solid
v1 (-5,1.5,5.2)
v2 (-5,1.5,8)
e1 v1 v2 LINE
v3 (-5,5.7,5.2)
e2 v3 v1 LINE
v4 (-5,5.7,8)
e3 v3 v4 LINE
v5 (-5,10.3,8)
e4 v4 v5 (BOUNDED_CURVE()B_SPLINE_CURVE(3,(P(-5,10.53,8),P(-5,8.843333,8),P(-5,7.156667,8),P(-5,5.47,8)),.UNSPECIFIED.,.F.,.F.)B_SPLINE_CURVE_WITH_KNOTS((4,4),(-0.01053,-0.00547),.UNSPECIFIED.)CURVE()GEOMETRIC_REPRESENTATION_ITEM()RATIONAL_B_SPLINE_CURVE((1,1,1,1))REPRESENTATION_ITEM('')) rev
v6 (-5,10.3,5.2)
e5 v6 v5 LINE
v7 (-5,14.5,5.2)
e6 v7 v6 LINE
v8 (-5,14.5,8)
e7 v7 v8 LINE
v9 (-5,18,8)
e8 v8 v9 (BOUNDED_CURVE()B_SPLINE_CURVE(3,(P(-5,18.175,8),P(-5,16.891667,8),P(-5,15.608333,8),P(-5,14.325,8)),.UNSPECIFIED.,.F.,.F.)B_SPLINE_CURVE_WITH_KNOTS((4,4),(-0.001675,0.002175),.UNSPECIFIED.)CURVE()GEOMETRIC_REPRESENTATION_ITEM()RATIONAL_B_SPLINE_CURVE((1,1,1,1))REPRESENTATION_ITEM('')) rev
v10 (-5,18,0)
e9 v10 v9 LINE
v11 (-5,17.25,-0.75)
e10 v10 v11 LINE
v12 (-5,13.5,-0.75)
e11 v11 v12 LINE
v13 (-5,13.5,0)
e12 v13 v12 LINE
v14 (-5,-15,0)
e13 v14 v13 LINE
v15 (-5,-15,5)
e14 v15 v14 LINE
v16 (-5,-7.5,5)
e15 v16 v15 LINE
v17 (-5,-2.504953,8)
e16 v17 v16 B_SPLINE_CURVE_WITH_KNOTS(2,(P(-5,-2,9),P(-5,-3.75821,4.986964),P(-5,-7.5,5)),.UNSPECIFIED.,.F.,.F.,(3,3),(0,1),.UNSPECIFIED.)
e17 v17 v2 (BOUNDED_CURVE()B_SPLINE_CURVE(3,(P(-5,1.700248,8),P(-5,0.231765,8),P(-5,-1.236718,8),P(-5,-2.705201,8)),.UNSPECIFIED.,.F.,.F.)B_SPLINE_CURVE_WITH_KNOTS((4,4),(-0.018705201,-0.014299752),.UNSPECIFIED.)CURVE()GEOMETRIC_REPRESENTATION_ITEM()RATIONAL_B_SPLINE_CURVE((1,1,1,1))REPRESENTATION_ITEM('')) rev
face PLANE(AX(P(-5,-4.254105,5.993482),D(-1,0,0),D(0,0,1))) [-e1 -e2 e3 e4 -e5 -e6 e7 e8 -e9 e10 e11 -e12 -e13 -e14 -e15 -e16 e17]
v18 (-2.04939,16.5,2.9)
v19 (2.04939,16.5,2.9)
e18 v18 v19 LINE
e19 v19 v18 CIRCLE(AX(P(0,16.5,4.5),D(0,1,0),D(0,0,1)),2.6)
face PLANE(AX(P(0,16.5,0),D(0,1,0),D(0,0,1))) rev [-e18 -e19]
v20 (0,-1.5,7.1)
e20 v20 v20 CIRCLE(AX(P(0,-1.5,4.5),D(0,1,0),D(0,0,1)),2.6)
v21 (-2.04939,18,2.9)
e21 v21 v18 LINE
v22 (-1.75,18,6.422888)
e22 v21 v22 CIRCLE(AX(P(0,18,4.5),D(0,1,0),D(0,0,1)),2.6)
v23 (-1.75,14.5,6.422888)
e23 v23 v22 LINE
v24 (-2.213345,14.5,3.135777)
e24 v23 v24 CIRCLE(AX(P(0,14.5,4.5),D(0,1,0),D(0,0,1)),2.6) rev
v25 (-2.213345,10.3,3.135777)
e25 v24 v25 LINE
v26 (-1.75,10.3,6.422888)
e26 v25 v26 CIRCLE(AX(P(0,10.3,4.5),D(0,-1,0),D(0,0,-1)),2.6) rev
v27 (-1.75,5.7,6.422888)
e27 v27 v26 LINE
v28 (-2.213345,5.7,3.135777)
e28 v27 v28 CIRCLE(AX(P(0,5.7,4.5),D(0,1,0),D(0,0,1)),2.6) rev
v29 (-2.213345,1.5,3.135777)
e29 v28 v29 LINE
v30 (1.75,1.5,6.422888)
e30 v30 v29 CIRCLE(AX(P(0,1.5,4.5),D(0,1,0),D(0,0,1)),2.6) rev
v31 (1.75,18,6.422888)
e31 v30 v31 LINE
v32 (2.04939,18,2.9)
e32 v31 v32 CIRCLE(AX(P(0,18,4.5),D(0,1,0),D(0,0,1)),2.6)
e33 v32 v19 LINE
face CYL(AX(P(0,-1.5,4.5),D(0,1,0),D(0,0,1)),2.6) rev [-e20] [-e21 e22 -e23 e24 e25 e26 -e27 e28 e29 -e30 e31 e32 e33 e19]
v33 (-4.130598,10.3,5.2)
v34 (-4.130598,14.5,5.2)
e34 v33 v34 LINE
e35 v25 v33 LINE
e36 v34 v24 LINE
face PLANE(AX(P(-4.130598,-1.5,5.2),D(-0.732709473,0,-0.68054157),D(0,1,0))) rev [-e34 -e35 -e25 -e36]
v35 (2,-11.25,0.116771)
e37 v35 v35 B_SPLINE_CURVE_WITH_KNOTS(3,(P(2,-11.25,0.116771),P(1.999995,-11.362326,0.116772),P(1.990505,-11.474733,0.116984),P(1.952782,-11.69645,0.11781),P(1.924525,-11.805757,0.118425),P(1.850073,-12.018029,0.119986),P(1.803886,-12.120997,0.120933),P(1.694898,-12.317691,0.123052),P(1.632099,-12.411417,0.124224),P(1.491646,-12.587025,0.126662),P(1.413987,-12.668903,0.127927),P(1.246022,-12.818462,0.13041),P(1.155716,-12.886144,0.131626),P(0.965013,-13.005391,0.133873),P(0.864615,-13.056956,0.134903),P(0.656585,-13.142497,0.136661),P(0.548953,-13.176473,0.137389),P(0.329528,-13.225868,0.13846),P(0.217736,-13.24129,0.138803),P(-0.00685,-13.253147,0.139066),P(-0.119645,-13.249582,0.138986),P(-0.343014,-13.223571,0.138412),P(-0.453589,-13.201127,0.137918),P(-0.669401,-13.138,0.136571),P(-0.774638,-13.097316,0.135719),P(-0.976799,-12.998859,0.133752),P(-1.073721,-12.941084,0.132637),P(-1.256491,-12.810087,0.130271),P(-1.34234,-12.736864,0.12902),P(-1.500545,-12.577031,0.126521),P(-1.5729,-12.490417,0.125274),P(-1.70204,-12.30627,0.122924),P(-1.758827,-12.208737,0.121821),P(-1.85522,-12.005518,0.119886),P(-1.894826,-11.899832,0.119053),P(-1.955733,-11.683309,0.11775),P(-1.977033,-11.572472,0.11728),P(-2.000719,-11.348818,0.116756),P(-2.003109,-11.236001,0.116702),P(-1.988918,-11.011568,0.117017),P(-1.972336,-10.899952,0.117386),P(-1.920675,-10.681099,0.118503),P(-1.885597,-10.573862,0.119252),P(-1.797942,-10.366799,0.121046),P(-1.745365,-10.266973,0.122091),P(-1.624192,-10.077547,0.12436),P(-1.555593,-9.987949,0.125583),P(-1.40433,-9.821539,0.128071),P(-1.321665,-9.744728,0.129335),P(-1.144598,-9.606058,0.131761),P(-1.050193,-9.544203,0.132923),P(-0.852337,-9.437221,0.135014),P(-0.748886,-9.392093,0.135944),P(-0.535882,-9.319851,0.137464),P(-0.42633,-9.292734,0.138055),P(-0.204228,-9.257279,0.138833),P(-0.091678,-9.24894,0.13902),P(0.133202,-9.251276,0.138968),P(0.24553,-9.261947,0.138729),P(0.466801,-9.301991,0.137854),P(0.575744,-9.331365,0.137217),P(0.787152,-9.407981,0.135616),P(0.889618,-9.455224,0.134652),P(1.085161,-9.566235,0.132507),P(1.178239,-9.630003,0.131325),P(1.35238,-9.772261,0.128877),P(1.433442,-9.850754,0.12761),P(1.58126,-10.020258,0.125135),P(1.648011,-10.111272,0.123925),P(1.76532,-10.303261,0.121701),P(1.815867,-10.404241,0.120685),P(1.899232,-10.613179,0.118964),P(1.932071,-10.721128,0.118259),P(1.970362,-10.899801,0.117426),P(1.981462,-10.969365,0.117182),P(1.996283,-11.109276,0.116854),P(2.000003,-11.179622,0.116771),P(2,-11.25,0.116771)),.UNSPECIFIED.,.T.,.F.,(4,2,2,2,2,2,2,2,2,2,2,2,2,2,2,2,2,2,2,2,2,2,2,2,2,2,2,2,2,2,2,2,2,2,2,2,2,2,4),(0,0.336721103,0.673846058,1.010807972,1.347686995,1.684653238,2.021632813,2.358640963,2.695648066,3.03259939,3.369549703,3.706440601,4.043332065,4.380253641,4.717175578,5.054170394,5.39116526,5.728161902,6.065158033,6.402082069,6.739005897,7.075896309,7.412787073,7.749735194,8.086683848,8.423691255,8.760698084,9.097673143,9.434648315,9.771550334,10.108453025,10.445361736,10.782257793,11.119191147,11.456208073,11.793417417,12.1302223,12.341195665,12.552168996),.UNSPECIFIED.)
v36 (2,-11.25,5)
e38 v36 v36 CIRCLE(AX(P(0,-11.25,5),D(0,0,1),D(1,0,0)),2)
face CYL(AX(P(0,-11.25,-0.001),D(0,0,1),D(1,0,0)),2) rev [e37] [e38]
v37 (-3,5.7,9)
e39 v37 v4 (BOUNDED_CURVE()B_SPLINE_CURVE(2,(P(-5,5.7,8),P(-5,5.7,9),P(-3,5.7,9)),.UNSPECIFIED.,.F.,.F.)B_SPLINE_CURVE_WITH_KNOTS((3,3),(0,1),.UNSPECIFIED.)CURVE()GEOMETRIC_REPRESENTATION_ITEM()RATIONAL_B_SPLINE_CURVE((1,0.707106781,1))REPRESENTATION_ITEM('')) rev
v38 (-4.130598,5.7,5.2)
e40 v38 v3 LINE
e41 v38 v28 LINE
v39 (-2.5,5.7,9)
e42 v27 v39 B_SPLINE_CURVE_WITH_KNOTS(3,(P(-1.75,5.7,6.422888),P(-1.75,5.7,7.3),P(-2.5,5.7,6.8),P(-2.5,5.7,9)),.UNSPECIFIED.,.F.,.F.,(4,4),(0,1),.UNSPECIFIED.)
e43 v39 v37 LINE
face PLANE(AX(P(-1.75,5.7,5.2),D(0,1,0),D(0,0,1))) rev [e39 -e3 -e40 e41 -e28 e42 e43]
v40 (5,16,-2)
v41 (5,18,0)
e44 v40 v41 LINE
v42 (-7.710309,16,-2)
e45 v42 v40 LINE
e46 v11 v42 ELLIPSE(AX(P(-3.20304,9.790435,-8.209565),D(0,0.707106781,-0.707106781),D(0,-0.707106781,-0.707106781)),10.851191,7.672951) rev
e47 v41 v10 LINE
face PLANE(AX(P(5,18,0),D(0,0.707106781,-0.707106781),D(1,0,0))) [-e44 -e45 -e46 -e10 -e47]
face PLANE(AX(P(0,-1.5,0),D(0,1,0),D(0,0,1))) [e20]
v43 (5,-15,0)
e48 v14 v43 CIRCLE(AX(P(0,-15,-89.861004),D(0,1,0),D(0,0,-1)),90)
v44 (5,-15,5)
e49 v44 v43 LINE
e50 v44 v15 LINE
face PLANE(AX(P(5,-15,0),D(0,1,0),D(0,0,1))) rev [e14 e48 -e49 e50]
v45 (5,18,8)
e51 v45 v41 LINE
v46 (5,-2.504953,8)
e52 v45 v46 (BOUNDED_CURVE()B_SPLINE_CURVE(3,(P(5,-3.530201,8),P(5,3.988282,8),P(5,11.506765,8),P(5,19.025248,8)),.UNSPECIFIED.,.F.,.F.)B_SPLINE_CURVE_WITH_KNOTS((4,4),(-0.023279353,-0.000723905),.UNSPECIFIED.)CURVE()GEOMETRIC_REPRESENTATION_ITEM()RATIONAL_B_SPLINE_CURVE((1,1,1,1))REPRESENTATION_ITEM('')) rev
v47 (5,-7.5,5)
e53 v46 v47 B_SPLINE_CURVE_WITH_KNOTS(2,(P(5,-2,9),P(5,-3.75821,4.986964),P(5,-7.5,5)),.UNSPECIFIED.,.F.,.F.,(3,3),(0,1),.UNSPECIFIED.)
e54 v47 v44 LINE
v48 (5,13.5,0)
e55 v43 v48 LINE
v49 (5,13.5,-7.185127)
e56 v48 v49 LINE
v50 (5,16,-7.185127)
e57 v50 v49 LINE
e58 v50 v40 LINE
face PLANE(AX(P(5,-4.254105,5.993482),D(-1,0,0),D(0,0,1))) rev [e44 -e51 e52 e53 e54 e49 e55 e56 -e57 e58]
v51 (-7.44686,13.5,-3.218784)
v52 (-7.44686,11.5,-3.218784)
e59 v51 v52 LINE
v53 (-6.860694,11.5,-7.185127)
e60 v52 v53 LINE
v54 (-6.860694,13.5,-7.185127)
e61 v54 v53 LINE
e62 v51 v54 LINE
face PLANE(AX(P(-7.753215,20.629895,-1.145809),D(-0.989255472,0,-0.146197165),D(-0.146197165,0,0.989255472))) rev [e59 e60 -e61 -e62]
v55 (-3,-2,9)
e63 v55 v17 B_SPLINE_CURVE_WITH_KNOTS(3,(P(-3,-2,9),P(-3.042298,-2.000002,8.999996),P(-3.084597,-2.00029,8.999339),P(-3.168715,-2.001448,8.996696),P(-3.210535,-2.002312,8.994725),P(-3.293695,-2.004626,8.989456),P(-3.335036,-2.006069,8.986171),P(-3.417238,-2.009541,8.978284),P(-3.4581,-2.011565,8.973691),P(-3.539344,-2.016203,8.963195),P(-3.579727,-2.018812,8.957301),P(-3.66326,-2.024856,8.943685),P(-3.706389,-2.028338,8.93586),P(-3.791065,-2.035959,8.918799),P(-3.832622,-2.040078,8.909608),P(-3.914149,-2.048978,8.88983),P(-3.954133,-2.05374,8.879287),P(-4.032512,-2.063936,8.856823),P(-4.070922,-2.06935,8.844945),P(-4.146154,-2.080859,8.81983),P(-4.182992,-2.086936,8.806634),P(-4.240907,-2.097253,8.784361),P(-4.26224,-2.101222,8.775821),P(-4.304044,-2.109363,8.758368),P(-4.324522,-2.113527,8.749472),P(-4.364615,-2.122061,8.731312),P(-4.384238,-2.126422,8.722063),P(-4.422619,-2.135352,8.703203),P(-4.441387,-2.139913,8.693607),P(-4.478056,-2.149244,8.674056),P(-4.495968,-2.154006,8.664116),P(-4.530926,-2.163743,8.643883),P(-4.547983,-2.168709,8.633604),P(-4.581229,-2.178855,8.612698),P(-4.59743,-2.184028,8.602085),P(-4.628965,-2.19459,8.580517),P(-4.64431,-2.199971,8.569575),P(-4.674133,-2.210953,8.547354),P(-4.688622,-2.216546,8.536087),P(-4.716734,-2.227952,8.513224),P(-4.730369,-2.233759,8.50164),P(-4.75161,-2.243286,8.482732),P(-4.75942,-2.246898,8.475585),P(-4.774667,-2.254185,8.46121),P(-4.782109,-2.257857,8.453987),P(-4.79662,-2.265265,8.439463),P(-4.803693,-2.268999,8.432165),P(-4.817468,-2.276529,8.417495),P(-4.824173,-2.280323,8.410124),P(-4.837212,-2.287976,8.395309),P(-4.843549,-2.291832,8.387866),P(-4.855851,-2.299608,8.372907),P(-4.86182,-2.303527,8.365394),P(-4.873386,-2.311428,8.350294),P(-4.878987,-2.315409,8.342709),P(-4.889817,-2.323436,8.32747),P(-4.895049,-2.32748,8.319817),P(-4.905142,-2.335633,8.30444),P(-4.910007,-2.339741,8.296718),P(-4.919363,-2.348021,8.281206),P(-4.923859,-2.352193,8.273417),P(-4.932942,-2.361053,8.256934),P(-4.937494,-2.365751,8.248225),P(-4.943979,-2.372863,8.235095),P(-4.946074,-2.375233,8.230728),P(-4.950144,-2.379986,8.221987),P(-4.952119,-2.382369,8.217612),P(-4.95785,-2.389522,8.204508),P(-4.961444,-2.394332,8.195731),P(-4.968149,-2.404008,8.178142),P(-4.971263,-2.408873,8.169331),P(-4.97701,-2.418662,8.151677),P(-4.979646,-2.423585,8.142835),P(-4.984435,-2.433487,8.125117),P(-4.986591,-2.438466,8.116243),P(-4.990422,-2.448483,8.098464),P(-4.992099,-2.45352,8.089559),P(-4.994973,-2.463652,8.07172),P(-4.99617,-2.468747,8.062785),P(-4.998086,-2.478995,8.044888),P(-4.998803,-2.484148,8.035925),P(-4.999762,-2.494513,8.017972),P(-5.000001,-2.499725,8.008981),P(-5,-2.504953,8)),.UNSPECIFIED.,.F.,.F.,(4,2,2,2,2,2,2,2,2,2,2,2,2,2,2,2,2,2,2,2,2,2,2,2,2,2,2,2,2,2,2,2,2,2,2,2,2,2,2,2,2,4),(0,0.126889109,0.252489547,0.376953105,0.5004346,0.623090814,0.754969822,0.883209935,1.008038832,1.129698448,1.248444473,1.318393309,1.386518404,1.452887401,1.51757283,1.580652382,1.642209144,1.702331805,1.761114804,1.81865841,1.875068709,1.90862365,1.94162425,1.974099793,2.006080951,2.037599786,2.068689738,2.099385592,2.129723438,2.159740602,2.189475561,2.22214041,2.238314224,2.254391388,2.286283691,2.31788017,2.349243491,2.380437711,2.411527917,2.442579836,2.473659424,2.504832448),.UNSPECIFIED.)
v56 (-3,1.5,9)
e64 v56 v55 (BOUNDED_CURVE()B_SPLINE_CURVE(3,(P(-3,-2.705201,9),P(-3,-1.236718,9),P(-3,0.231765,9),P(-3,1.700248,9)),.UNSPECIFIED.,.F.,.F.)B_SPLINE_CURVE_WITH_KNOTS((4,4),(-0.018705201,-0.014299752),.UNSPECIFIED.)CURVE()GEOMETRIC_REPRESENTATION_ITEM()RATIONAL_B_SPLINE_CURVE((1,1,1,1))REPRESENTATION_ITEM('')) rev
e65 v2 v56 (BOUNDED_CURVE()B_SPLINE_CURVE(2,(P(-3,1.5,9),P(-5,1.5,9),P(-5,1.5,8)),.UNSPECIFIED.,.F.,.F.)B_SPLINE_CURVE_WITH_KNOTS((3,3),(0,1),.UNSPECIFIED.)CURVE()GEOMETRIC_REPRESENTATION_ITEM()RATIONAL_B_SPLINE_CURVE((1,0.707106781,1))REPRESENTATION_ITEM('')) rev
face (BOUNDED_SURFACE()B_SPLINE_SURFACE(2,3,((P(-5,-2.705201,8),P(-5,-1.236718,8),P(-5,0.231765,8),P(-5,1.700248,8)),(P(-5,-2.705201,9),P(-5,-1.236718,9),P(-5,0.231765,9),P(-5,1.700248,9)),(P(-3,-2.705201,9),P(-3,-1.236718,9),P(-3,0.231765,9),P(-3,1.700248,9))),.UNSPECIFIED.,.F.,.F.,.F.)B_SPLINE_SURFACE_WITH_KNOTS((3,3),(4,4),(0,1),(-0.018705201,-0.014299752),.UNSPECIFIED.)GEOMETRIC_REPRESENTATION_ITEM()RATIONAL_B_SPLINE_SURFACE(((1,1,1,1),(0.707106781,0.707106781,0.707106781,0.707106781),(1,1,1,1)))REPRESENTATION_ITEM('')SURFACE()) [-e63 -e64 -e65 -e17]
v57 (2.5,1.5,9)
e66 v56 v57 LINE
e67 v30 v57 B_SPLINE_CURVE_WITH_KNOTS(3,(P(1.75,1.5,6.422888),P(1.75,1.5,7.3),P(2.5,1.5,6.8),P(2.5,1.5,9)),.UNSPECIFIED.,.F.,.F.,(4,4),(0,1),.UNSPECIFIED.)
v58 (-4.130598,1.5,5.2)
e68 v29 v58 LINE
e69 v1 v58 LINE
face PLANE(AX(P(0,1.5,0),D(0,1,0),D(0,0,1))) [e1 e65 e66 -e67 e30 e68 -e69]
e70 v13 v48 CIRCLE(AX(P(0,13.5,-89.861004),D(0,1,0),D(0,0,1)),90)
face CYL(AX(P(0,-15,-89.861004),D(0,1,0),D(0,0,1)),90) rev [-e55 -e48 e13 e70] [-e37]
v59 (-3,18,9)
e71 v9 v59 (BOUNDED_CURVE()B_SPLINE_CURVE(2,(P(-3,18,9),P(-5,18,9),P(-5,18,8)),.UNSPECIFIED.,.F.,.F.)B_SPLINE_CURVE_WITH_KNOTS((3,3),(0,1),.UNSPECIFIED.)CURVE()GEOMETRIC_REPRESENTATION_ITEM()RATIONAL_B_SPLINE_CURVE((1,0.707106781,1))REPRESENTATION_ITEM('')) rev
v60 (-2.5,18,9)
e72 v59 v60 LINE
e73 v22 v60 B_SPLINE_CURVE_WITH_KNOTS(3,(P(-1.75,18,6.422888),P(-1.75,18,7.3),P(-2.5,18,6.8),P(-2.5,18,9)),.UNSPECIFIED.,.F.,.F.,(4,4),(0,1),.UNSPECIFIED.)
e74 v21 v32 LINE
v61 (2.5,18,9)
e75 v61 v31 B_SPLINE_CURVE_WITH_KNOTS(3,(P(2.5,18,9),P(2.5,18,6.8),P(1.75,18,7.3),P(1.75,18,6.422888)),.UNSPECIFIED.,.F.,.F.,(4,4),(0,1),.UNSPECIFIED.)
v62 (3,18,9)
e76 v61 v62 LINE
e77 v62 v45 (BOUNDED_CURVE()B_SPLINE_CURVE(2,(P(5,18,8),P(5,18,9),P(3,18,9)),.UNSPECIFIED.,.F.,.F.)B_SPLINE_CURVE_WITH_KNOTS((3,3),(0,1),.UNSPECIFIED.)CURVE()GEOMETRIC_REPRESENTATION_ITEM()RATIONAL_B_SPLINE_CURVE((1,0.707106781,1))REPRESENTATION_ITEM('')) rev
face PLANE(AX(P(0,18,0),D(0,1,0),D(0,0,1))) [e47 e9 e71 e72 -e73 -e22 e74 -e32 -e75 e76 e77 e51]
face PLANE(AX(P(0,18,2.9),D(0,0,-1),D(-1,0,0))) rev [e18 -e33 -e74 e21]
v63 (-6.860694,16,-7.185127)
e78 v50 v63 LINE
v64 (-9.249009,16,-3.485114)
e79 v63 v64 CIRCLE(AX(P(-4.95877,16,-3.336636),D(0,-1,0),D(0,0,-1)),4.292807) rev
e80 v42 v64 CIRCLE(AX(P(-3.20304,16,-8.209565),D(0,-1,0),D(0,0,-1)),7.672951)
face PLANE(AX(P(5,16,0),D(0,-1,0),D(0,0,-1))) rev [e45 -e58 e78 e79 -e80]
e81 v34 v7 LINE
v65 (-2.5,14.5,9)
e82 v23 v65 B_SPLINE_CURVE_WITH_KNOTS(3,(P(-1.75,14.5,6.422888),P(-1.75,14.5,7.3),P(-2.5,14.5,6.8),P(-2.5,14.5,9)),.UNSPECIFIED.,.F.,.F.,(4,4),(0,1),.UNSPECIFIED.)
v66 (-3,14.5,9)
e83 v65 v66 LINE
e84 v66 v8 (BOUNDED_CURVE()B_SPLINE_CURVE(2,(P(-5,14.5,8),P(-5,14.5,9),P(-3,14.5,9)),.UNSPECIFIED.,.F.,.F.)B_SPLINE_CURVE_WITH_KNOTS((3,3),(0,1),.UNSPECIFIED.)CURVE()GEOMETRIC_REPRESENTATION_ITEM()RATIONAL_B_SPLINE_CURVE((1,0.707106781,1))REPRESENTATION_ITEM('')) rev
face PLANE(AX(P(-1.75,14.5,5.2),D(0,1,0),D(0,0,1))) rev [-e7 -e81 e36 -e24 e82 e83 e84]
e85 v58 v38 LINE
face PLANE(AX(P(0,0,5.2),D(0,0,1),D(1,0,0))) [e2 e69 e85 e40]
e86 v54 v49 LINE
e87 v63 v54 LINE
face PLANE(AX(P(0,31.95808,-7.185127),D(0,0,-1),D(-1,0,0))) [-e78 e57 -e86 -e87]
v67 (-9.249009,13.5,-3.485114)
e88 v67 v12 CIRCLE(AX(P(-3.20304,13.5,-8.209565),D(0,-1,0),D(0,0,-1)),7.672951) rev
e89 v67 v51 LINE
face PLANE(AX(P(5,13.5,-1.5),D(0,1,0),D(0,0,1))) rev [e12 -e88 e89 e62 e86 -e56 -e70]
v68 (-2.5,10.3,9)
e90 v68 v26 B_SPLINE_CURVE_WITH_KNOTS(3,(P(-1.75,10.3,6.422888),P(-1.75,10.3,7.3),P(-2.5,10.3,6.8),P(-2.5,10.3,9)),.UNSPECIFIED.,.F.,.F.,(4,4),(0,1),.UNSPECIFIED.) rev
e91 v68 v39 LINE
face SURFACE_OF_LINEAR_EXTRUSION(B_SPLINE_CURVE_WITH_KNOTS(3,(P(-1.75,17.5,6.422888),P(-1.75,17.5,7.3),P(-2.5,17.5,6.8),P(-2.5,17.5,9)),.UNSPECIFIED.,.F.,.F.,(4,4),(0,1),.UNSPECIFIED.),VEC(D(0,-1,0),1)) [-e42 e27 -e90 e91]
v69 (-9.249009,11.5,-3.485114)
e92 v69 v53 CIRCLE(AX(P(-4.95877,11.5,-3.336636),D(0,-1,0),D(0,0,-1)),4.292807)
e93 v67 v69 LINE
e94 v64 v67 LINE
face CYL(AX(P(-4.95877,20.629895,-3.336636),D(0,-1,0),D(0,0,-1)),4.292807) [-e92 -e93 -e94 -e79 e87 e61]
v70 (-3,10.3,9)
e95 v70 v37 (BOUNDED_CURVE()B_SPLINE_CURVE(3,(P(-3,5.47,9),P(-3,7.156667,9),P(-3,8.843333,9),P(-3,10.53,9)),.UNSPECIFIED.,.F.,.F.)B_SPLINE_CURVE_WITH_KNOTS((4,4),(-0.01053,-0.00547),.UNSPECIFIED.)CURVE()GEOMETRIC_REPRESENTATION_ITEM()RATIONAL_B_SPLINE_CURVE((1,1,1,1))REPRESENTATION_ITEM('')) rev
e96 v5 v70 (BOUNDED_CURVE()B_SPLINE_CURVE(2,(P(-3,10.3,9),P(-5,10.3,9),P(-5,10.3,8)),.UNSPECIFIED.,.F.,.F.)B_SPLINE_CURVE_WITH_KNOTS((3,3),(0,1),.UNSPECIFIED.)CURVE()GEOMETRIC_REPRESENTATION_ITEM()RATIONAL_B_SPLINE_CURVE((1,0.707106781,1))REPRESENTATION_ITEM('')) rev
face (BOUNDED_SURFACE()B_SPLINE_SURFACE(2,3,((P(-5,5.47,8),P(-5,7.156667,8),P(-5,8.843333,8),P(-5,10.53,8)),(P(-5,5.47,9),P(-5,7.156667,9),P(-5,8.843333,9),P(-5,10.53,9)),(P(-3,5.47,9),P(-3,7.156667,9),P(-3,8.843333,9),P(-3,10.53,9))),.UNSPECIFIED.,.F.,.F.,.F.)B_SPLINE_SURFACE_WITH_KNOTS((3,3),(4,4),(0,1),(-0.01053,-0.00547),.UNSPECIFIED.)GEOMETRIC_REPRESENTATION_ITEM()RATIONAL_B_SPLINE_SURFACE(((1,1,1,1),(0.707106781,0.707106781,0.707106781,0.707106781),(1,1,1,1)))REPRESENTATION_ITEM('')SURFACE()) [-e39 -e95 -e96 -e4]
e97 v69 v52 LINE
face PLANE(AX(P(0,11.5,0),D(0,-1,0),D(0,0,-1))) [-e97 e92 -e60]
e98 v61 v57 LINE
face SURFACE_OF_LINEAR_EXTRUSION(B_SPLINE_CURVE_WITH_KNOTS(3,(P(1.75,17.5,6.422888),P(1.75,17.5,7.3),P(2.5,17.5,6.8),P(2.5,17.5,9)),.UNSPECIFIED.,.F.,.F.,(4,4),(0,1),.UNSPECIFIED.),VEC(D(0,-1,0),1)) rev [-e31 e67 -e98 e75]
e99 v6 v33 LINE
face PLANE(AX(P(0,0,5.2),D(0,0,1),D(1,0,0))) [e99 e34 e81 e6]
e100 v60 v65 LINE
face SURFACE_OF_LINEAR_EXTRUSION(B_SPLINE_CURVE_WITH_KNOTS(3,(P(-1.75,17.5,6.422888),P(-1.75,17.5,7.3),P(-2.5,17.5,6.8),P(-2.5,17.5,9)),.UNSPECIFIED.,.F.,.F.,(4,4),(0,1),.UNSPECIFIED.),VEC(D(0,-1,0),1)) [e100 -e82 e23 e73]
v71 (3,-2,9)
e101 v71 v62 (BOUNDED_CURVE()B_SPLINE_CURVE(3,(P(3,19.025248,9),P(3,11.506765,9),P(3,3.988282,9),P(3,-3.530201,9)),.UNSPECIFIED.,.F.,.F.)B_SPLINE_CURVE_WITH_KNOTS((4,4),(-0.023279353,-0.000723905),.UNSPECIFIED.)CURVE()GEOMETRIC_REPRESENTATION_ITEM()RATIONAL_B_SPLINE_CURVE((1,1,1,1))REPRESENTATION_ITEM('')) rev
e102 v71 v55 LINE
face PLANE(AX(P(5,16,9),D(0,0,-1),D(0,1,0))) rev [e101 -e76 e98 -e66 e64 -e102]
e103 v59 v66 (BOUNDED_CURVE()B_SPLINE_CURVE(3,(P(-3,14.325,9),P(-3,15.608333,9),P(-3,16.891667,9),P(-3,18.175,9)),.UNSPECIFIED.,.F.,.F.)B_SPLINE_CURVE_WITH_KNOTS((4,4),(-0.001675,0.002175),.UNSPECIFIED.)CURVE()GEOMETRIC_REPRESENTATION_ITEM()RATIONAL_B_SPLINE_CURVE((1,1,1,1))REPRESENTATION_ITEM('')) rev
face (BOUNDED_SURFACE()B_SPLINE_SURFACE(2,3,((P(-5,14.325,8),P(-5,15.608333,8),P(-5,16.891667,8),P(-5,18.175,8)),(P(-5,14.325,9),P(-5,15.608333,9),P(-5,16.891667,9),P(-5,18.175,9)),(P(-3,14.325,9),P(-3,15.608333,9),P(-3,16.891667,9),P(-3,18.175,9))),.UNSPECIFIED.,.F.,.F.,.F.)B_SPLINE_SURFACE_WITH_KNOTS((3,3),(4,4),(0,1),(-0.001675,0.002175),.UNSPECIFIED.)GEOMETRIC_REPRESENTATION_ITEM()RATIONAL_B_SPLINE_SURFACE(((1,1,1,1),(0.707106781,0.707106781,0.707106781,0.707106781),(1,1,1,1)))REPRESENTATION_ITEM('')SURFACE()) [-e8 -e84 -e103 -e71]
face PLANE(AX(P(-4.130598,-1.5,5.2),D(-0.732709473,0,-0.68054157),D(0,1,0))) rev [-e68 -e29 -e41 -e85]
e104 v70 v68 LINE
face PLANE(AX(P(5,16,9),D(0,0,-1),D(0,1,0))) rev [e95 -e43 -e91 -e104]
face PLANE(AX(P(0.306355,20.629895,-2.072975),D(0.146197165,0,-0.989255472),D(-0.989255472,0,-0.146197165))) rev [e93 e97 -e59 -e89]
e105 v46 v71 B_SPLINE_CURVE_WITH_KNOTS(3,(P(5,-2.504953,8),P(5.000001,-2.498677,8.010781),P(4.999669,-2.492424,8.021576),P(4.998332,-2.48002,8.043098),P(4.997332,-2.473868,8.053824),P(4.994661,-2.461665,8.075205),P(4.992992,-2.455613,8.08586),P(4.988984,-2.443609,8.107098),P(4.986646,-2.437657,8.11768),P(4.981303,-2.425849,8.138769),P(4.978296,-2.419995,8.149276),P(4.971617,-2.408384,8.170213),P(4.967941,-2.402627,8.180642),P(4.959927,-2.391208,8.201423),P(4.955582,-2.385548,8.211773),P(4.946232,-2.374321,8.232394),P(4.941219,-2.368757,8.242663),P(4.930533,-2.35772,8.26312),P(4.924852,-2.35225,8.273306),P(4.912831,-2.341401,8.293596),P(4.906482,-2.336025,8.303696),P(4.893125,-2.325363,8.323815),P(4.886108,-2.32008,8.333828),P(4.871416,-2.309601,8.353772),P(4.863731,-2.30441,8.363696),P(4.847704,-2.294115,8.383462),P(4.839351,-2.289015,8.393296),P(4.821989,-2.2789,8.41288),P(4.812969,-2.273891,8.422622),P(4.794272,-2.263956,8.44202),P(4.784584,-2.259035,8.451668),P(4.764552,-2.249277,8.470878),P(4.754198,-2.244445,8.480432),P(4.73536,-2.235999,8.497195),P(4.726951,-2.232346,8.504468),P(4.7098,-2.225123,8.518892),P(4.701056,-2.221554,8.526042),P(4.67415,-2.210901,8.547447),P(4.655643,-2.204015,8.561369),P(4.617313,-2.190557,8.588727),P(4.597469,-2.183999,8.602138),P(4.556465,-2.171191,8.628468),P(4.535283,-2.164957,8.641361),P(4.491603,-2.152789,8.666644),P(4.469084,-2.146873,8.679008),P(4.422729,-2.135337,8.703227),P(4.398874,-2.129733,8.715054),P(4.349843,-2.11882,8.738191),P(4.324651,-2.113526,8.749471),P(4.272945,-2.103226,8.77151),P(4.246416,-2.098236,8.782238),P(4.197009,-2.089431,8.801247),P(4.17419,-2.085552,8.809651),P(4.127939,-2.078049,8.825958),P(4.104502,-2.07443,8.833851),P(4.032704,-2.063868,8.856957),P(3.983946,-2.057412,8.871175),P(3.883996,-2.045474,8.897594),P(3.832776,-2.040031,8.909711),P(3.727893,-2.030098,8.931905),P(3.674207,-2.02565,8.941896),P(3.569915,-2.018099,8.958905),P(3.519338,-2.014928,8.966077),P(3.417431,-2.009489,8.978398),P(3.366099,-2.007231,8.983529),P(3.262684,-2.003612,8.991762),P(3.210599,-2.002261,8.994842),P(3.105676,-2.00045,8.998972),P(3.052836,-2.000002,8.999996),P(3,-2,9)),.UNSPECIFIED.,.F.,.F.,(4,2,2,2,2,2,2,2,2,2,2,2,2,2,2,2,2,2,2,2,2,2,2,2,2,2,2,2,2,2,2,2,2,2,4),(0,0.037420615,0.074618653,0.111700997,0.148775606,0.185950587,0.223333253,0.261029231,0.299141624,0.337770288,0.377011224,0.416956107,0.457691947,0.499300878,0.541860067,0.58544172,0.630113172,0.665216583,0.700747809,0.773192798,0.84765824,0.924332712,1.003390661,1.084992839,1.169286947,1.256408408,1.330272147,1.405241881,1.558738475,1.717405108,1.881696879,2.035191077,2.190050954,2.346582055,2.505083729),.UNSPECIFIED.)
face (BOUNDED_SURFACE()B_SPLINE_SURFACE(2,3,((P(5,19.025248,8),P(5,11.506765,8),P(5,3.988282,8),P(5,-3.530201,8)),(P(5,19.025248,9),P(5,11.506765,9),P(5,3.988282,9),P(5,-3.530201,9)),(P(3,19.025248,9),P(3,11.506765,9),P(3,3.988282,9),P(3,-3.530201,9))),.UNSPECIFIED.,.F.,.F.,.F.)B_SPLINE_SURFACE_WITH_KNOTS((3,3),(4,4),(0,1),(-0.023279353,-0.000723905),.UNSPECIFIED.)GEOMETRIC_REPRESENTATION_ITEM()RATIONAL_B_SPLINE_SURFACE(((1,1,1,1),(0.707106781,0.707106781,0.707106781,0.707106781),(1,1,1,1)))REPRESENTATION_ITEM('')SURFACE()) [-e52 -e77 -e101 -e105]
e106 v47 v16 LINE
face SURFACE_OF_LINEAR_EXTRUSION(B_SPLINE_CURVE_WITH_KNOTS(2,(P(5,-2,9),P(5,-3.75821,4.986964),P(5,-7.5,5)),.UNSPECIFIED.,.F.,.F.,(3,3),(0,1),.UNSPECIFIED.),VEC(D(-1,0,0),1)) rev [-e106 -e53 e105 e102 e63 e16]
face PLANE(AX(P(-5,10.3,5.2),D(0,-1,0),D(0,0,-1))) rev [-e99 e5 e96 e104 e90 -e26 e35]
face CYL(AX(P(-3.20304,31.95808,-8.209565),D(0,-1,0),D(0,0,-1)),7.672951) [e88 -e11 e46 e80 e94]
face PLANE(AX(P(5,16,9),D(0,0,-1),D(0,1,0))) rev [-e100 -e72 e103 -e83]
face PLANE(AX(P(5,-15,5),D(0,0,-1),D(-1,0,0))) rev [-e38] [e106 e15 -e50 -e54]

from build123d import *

# Parameters (mm, degrees)
BOSS_EXTRUDE1_DEPTH             = 5
CUT_EXTRUDE1_REACH              = 19.493
SKETCH2_R                       = 2
BOSS_EXTRUDE2_DEPTH             = 5
CUT_EXTRUDE4_DEPTH              = 17.5
CUT_EXTRUDE10_START             = 17.5
CUT_EXTRUDE10_DEPTH             = 16
SKETCH15_W                      = 3.25
SKETCH15_H                      = 4.2
CUT_EXTRUDE11_DEPTH             = 3.8
CHAMFER2_START                  = 1.5
CHAMFER2_DEPTH                  = 4.2
CHAMFER2_START_2                = 10.3
CHAMFER2_2_DEPTH                = 4.2
CUT_EXTRUDE7_START              = -15
CUT_EXTRUDE7_DEPTH              = 28.5
BOSS_EXTRUDE7_DEPTH             = 2.5
BOSS_EXTRUDE8_DEPTH             = 2
BOSS_EXTRUDE8_DIRECTION_2_REACH = 33.286
SKETCH17_W                      = 10
SKETCH17_H                      = 9
BOSS_EXTRUDE10_DEPTH            = 2
CUT_EXTRUDE12_START             = 18
CUT_EXTRUDE12_DEPTH             = 2
CUT_EXTRUDE13_START             = 2
CUT_EXTRUDE13_DEPTH             = 2
CUT_EXTRUDE14_START             = 0.5
CUT_EXTRUDE14_DEPTH             = 0.5
FILLET8_SIZE                    = 2
FILLET8_SIZE_2                  = 1
FILLET6_SIZE                    = 1
FILLET6_SIZE_2                  = 2
CHAMFER3_SIZE                   = 2


with BuildPart() as part:
    # Sketch1 → Boss-Extrude1 (new, symmetric)
    with BuildSketch(Plane(origin=(0, 0, 0), x_dir=(0, 0, -1), z_dir=(1, 0, 0))):
        with BuildLine():
            Line((-5, -15), (-5, -7.5))
            add(Edge.make_bspline(
                [(-5, -7.5), (-4.98696359, -3.758210307), (-9, -2)],
                knots=[0, 0, 0, 1, 1, 1], degree=2))
            Line((-9, -2), (-9, 16))
            Line((-9, 16), (0, 16))
            Line((0, 16), (0, 0))
            Line((0, 0), (0, -15))
            Line((0, -15), (-5, -15))
        make_face()
    extrude(amount=BOSS_EXTRUDE1_DEPTH, both=True)

    # Sketch2 → Cut-Extrude1 (cut, up to next)
    with BuildSketch(Plane.XY.offset(5), mode=Mode.PRIVATE) as cut_extrude1_sk1:
        with Locations((0, -11.25)):
            Circle(SKETCH2_R)
    cut_extrude1_tool1 = extrude(cut_extrude1_sk1.sketch, amount=-CUT_EXTRUDE1_REACH, mode=Mode.PRIVATE) & part.part
    add(cut_extrude1_tool1.solids().sort_by_distance((0, -11.25, 5))[0], mode=Mode.SUBTRACT)

    # Sketch5 → Boss-Extrude2 (add, symmetric)
    with BuildSketch(Plane(origin=(0, 0, 0), x_dir=(0, 0, -1), z_dir=(1, 0, 0))):
        with BuildLine():
            Line((1.5, 13.5), (0, 13.5))
            Line((0, 13.5), (0, 16))
            add(Edge.make_bspline(
                [(1.5, 13.5), (1.5, 15.23543045), (1.140641964, 16), (0, 16)],
                knots=[0, 0, 0, 0, 1, 1, 1, 1], degree=3))
        make_face()
    extrude(amount=BOSS_EXTRUDE2_DEPTH, both=True)

    # Sketch6 → Cut-Extrude4 (cut)
    with BuildSketch(Plane(origin=(0, 16, 0), x_dir=(1, 0, 0), z_dir=(0, 1, 0))):
        with BuildLine():
            ThreePointArc((2.049390153, -2.9), (0, -1.9), (-2.049390153, -2.9))
            Line((-2.049390153, -2.9), (2.049390153, -2.9))
        make_face()
        with BuildLine():
            Line((2.049390153, -2.9), (-2.049390153, -2.9))
            ThreePointArc((-2.049390153, -2.9), (-0.846045389, -6.958496939), (2.6, -4.5))
            ThreePointArc((2.6, -4.5), (2.458496939, -3.653954611), (2.049390153, -2.9))
        make_face()
    extrude(amount=-CUT_EXTRUDE4_DEPTH, mode=Mode.SUBTRACT)

    # Sketch13 → Cut-Extrude10 (cut)
    with BuildSketch(Plane(origin=(0, 0, 0), x_dir=(1, 0, 0), z_dir=(0, 1, 0)).offset(CUT_EXTRUDE10_START)):
        with BuildLine():
            ThreePointArc((1.75, -6.422888452), (0, -7.1), (-1.75, -6.422888452))
            add(Edge.make_bspline(
                [(-1.75, -6.422888452), (-1.75, -7.3), (-2.5, -6.8), (-2.5, -9)],
                knots=[0, 0, 0, 0, 1, 1, 1, 1], degree=3))
            Line((-2.5, -9), (2.5, -9))
            add(Edge.make_bspline(
                [(1.75, -6.422888452), (1.75, -7.3), (2.5, -6.8), (2.5, -9)],
                knots=[0, 0, 0, 0, 1, 1, 1, 1], degree=3))
        make_face()
    extrude(amount=-CUT_EXTRUDE10_DEPTH, mode=Mode.SUBTRACT)

    # Sketch15 → Cut-Extrude11 (cut)
    with BuildSketch(Plane.XY.offset(9)):
        with Locations((-3.375, 3.6)):
            Rectangle(SKETCH15_W, SKETCH15_H)
        with Locations((-3.375, 12.4)):
            Rectangle(SKETCH15_W, SKETCH15_H)
    extrude(amount=-CUT_EXTRUDE11_DEPTH, mode=Mode.SUBTRACT)

    # Chamfer2: read off the stored shape, not the designer's step
    # Chamfer2 outline → Chamfer2 (cut)
    with BuildSketch(Plane(origin=(0, 0, 0), x_dir=(1, 0, 0), z_dir=(0, 1, 0)).offset(CHAMFER2_START)):
        with BuildLine():
            ThreePointArc((-2.503996805, -5.2), (-2.574603342, -4.137484302), (-2.213344965, -3.13577712))
            Line((-2.213344965, -3.13577712), (-4.130598027, -5.2))
            Line((-4.130598027, -5.2), (-2.503996805, -5.2))
        make_face()
    extrude(amount=CHAMFER2_DEPTH, mode=Mode.SUBTRACT)

    # Chamfer2 2 outline → Chamfer2 2 (cut)
    with BuildSketch(Plane(origin=(0, 0, 0), x_dir=(1, 0, 0), z_dir=(0, 1, 0)).offset(CHAMFER2_START_2)):
        with BuildLine():
            ThreePointArc((-2.503996805, -5.2), (-2.574603342, -4.137484302), (-2.213344965, -3.13577712))
            Line((-2.213344965, -3.13577712), (-4.130598027, -5.2))
            Line((-4.130598027, -5.2), (-2.503996805, -5.2))
        make_face()
    extrude(amount=CHAMFER2_2_DEPTH, mode=Mode.SUBTRACT)

    # Sketch9 → Cut-Extrude7 (cut)
    with BuildSketch(Plane(origin=(0, 0, 0), x_dir=(1, 0, 0), z_dir=(0, 1, 0)).offset(CUT_EXTRUDE7_START)):
        with BuildLine():
            Line((5, 0), (-5, 0))
            ThreePointArc((-5, 0), (0, -0.138996222), (5, 0))
        make_face()
    extrude(amount=CUT_EXTRUDE7_DEPTH, mode=Mode.SUBTRACT)

    # Sketch12 → Boss-Extrude7 (add)
    with BuildSketch(Plane.XZ.offset(-13.5)):
        with BuildLine():
            Line((5, 0), (-5, 0))
            Line((-5, 0), (-5, -0.75))
            ThreePointArc((-5, -0.75), (-7.356122713, -1.757737527), (-9.249008864, -3.485114493))
            Line((-9.249008864, -3.485114493), (-7.446859958, -3.218783834))
            Line((-7.446859958, -3.218783834), (-6.860693731, -7.185127133))
            Line((-6.860693731, -7.185127133), (5, -7.185127133))
            Line((5, -7.185127133), (5, 0))
        make_face()
    extrude(amount=-BOSS_EXTRUDE7_DEPTH)

    # Sketch12<4> → Boss-Extrude8 (add)
    with BuildSketch(Plane.XZ.offset(-13.5)):
        with BuildLine():
            Line((-9.249008864, -3.485114493), (-7.446859958, -3.218783834))
            Line((-7.446859958, -3.218783834), (-6.860693731, -7.185127133))
            ThreePointArc((-6.860693731, -7.185127133), (-8.565464188, -5.664715496), (-9.249008864, -3.485114493))
        make_face()
    extrude(amount=BOSS_EXTRUDE8_DEPTH)

    # Boss-Extrude8 direction 2: up to this face of the body (flat: up to its plane)
    boss_extrude8_direction_2_end = Plane(part.part.faces().sort_by_distance((-0.643733598, 16, -0.592776419))[0])
    # Sketch12<4> → Boss-Extrude8 direction 2 (add, up to the picked face)
    with BuildSketch(Plane.XZ.offset(-13.5), mode=Mode.PRIVATE) as boss_extrude8_direction_2_sk1:
        with BuildLine():
            Line((-9.249008864, -3.485114493), (-7.446859958, -3.218783834))
            Line((-7.446859958, -3.218783834), (-6.860693731, -7.185127133))
            ThreePointArc((-6.860693731, -7.185127133), (-8.565464188, -5.664715496), (-9.249008864, -3.485114493))
        make_face()
    boss_extrude8_direction_2_tool1 = split(extrude(boss_extrude8_direction_2_sk1.sketch, amount=-BOSS_EXTRUDE8_DIRECTION_2_REACH, mode=Mode.PRIVATE), bisect_by=boss_extrude8_direction_2_end, keep=Keep.BOTH, mode=Mode.PRIVATE)
    add(boss_extrude8_direction_2_tool1.solids().sort_by(Axis((-7.987517, 13.5, -4.907532), (0, 1, 0)))[0])

    # Sketch17 → Boss-Extrude10 (add)
    with BuildSketch(Plane(origin=(0, 16, 0), x_dir=(1, 0, 0), z_dir=(0, 1, 0))):
        with Locations((0, -4.5)):
            Rectangle(SKETCH17_W, SKETCH17_H)
    extrude(amount=BOSS_EXTRUDE10_DEPTH)

    # Sketch13<3> → Cut-Extrude12 (cut)
    with BuildSketch(Plane(origin=(0, 0, 0), x_dir=(1, 0, 0), z_dir=(0, 1, 0)).offset(CUT_EXTRUDE12_START)):
        with BuildLine():
            Line((-2.5, -9), (2.5, -9))
            add(Edge.make_bspline(
                [(1.75, -6.422888452), (1.75, -7.3), (2.5, -6.8), (2.5, -9)],
                knots=[0, 0, 0, 0, 1, 1, 1, 1], degree=3))
            ThreePointArc((1.75, -6.422888452), (0, -7.1), (-1.75, -6.422888452))
            add(Edge.make_bspline(
                [(-1.75, -6.422888452), (-1.75, -7.3), (-2.5, -6.8), (-2.5, -9)],
                knots=[0, 0, 0, 0, 1, 1, 1, 1], degree=3))
        make_face()
    extrude(amount=-CUT_EXTRUDE12_DEPTH, mode=Mode.SUBTRACT)

    # Sketch6<4> → Cut-Extrude13 (cut)
    with BuildSketch(Plane(origin=(0, 16, 0), x_dir=(1, 0, 0), z_dir=(0, 1, 0)).offset(CUT_EXTRUDE13_START)):
        with BuildLine():
            Line((2.049390153, -2.9), (-2.049390153, -2.9))
            ThreePointArc((-2.049390153, -2.9), (-0.846045389, -6.958496939), (2.6, -4.5))
            ThreePointArc((2.6, -4.5), (2.458496939, -3.653954611), (2.049390153, -2.9))
        make_face()
    extrude(amount=-CUT_EXTRUDE13_DEPTH, mode=Mode.SUBTRACT)

    # Sketch6<5> → Cut-Extrude14 (cut)
    with BuildSketch(Plane(origin=(0, 16, 0), x_dir=(1, 0, 0), z_dir=(0, 1, 0)).offset(CUT_EXTRUDE14_START)):
        with BuildLine():
            ThreePointArc((2.049390153, -2.9), (0, -1.9), (-2.049390153, -2.9))
            Line((-2.049390153, -2.9), (2.049390153, -2.9))
        make_face()
        with BuildLine():
            Line((2.049390153, -2.9), (-2.049390153, -2.9))
            ThreePointArc((-2.049390153, -2.9), (-0.846045389, -6.958496939), (2.6, -4.5))
            ThreePointArc((2.6, -4.5), (2.458496939, -3.653954611), (2.049390153, -2.9))
        make_face()
    extrude(amount=-CUT_EXTRUDE14_DEPTH, mode=Mode.SUBTRACT)

    # Fillet8
    # a fillet whose section is not a circle: 2, 1 mm, written as the material it takes off along each edge
    with BuildSketch(Plane(origin=(5, 23, 9), x_dir=(-1, 0, 0), z_dir=(0, -1, 0))) as fillet8_piece_1:
        with BuildLine():
            Bezier((FILLET8_SIZE, 0), (0, 0), (0, FILLET8_SIZE_2), weights=[1, 0.707106781, 1])
            Line((0, FILLET8_SIZE_2), (0, 0))
            Line((0, 0), (FILLET8_SIZE, 0))
        make_face()
    extrude(amount=30, mode=Mode.SUBTRACT)

    # Fillet6
    # a fillet whose section is not a circle: 2, 1 mm, written as the material it takes off along each edge
    with BuildSketch(Plane(origin=(-5, -7, 9), x_dir=(0, 0, -1), z_dir=(0, 1, 0)), Plane(origin=(-5, 9.5, 9), x_dir=(0, 0, -1), z_dir=(0, 1, 0))) as fillet6_piece_1:
        with BuildLine():
            Bezier((FILLET6_SIZE, 0), (0, 0), (0, -FILLET6_SIZE_2), weights=[1, 0.707106781, 1])
            Line((0, -FILLET6_SIZE_2), (0, 0))
            Line((0, 0), (FILLET6_SIZE, 0))
        make_face()
    extrude(amount=13.5, mode=Mode.SUBTRACT)
    with BuildSketch(Plane(origin=(-5, 0.7, 9), x_dir=(0, 0, -1), z_dir=(0, 1, 0))) as fillet6_piece_2:
        with BuildLine():
            Bezier((FILLET6_SIZE, 0), (0, 0), (0, -FILLET6_SIZE_2), weights=[1, 0.707106781, 1])
            Line((0, -FILLET6_SIZE_2), (0, 0))
            Line((0, 0), (FILLET6_SIZE, 0))
        make_face()
    extrude(amount=14.6, mode=Mode.SUBTRACT)

    # Chamfer3
    chamfer3_edges = [part.edges().sort_by_distance(p)[0] for p in [
        (0, 16, 0),
    ]]
    chamfer(chamfer3_edges, length=CHAMFER3_SIZE - 0.0001)  # a hair under: the kernel refuses the full size


solid = part.part
